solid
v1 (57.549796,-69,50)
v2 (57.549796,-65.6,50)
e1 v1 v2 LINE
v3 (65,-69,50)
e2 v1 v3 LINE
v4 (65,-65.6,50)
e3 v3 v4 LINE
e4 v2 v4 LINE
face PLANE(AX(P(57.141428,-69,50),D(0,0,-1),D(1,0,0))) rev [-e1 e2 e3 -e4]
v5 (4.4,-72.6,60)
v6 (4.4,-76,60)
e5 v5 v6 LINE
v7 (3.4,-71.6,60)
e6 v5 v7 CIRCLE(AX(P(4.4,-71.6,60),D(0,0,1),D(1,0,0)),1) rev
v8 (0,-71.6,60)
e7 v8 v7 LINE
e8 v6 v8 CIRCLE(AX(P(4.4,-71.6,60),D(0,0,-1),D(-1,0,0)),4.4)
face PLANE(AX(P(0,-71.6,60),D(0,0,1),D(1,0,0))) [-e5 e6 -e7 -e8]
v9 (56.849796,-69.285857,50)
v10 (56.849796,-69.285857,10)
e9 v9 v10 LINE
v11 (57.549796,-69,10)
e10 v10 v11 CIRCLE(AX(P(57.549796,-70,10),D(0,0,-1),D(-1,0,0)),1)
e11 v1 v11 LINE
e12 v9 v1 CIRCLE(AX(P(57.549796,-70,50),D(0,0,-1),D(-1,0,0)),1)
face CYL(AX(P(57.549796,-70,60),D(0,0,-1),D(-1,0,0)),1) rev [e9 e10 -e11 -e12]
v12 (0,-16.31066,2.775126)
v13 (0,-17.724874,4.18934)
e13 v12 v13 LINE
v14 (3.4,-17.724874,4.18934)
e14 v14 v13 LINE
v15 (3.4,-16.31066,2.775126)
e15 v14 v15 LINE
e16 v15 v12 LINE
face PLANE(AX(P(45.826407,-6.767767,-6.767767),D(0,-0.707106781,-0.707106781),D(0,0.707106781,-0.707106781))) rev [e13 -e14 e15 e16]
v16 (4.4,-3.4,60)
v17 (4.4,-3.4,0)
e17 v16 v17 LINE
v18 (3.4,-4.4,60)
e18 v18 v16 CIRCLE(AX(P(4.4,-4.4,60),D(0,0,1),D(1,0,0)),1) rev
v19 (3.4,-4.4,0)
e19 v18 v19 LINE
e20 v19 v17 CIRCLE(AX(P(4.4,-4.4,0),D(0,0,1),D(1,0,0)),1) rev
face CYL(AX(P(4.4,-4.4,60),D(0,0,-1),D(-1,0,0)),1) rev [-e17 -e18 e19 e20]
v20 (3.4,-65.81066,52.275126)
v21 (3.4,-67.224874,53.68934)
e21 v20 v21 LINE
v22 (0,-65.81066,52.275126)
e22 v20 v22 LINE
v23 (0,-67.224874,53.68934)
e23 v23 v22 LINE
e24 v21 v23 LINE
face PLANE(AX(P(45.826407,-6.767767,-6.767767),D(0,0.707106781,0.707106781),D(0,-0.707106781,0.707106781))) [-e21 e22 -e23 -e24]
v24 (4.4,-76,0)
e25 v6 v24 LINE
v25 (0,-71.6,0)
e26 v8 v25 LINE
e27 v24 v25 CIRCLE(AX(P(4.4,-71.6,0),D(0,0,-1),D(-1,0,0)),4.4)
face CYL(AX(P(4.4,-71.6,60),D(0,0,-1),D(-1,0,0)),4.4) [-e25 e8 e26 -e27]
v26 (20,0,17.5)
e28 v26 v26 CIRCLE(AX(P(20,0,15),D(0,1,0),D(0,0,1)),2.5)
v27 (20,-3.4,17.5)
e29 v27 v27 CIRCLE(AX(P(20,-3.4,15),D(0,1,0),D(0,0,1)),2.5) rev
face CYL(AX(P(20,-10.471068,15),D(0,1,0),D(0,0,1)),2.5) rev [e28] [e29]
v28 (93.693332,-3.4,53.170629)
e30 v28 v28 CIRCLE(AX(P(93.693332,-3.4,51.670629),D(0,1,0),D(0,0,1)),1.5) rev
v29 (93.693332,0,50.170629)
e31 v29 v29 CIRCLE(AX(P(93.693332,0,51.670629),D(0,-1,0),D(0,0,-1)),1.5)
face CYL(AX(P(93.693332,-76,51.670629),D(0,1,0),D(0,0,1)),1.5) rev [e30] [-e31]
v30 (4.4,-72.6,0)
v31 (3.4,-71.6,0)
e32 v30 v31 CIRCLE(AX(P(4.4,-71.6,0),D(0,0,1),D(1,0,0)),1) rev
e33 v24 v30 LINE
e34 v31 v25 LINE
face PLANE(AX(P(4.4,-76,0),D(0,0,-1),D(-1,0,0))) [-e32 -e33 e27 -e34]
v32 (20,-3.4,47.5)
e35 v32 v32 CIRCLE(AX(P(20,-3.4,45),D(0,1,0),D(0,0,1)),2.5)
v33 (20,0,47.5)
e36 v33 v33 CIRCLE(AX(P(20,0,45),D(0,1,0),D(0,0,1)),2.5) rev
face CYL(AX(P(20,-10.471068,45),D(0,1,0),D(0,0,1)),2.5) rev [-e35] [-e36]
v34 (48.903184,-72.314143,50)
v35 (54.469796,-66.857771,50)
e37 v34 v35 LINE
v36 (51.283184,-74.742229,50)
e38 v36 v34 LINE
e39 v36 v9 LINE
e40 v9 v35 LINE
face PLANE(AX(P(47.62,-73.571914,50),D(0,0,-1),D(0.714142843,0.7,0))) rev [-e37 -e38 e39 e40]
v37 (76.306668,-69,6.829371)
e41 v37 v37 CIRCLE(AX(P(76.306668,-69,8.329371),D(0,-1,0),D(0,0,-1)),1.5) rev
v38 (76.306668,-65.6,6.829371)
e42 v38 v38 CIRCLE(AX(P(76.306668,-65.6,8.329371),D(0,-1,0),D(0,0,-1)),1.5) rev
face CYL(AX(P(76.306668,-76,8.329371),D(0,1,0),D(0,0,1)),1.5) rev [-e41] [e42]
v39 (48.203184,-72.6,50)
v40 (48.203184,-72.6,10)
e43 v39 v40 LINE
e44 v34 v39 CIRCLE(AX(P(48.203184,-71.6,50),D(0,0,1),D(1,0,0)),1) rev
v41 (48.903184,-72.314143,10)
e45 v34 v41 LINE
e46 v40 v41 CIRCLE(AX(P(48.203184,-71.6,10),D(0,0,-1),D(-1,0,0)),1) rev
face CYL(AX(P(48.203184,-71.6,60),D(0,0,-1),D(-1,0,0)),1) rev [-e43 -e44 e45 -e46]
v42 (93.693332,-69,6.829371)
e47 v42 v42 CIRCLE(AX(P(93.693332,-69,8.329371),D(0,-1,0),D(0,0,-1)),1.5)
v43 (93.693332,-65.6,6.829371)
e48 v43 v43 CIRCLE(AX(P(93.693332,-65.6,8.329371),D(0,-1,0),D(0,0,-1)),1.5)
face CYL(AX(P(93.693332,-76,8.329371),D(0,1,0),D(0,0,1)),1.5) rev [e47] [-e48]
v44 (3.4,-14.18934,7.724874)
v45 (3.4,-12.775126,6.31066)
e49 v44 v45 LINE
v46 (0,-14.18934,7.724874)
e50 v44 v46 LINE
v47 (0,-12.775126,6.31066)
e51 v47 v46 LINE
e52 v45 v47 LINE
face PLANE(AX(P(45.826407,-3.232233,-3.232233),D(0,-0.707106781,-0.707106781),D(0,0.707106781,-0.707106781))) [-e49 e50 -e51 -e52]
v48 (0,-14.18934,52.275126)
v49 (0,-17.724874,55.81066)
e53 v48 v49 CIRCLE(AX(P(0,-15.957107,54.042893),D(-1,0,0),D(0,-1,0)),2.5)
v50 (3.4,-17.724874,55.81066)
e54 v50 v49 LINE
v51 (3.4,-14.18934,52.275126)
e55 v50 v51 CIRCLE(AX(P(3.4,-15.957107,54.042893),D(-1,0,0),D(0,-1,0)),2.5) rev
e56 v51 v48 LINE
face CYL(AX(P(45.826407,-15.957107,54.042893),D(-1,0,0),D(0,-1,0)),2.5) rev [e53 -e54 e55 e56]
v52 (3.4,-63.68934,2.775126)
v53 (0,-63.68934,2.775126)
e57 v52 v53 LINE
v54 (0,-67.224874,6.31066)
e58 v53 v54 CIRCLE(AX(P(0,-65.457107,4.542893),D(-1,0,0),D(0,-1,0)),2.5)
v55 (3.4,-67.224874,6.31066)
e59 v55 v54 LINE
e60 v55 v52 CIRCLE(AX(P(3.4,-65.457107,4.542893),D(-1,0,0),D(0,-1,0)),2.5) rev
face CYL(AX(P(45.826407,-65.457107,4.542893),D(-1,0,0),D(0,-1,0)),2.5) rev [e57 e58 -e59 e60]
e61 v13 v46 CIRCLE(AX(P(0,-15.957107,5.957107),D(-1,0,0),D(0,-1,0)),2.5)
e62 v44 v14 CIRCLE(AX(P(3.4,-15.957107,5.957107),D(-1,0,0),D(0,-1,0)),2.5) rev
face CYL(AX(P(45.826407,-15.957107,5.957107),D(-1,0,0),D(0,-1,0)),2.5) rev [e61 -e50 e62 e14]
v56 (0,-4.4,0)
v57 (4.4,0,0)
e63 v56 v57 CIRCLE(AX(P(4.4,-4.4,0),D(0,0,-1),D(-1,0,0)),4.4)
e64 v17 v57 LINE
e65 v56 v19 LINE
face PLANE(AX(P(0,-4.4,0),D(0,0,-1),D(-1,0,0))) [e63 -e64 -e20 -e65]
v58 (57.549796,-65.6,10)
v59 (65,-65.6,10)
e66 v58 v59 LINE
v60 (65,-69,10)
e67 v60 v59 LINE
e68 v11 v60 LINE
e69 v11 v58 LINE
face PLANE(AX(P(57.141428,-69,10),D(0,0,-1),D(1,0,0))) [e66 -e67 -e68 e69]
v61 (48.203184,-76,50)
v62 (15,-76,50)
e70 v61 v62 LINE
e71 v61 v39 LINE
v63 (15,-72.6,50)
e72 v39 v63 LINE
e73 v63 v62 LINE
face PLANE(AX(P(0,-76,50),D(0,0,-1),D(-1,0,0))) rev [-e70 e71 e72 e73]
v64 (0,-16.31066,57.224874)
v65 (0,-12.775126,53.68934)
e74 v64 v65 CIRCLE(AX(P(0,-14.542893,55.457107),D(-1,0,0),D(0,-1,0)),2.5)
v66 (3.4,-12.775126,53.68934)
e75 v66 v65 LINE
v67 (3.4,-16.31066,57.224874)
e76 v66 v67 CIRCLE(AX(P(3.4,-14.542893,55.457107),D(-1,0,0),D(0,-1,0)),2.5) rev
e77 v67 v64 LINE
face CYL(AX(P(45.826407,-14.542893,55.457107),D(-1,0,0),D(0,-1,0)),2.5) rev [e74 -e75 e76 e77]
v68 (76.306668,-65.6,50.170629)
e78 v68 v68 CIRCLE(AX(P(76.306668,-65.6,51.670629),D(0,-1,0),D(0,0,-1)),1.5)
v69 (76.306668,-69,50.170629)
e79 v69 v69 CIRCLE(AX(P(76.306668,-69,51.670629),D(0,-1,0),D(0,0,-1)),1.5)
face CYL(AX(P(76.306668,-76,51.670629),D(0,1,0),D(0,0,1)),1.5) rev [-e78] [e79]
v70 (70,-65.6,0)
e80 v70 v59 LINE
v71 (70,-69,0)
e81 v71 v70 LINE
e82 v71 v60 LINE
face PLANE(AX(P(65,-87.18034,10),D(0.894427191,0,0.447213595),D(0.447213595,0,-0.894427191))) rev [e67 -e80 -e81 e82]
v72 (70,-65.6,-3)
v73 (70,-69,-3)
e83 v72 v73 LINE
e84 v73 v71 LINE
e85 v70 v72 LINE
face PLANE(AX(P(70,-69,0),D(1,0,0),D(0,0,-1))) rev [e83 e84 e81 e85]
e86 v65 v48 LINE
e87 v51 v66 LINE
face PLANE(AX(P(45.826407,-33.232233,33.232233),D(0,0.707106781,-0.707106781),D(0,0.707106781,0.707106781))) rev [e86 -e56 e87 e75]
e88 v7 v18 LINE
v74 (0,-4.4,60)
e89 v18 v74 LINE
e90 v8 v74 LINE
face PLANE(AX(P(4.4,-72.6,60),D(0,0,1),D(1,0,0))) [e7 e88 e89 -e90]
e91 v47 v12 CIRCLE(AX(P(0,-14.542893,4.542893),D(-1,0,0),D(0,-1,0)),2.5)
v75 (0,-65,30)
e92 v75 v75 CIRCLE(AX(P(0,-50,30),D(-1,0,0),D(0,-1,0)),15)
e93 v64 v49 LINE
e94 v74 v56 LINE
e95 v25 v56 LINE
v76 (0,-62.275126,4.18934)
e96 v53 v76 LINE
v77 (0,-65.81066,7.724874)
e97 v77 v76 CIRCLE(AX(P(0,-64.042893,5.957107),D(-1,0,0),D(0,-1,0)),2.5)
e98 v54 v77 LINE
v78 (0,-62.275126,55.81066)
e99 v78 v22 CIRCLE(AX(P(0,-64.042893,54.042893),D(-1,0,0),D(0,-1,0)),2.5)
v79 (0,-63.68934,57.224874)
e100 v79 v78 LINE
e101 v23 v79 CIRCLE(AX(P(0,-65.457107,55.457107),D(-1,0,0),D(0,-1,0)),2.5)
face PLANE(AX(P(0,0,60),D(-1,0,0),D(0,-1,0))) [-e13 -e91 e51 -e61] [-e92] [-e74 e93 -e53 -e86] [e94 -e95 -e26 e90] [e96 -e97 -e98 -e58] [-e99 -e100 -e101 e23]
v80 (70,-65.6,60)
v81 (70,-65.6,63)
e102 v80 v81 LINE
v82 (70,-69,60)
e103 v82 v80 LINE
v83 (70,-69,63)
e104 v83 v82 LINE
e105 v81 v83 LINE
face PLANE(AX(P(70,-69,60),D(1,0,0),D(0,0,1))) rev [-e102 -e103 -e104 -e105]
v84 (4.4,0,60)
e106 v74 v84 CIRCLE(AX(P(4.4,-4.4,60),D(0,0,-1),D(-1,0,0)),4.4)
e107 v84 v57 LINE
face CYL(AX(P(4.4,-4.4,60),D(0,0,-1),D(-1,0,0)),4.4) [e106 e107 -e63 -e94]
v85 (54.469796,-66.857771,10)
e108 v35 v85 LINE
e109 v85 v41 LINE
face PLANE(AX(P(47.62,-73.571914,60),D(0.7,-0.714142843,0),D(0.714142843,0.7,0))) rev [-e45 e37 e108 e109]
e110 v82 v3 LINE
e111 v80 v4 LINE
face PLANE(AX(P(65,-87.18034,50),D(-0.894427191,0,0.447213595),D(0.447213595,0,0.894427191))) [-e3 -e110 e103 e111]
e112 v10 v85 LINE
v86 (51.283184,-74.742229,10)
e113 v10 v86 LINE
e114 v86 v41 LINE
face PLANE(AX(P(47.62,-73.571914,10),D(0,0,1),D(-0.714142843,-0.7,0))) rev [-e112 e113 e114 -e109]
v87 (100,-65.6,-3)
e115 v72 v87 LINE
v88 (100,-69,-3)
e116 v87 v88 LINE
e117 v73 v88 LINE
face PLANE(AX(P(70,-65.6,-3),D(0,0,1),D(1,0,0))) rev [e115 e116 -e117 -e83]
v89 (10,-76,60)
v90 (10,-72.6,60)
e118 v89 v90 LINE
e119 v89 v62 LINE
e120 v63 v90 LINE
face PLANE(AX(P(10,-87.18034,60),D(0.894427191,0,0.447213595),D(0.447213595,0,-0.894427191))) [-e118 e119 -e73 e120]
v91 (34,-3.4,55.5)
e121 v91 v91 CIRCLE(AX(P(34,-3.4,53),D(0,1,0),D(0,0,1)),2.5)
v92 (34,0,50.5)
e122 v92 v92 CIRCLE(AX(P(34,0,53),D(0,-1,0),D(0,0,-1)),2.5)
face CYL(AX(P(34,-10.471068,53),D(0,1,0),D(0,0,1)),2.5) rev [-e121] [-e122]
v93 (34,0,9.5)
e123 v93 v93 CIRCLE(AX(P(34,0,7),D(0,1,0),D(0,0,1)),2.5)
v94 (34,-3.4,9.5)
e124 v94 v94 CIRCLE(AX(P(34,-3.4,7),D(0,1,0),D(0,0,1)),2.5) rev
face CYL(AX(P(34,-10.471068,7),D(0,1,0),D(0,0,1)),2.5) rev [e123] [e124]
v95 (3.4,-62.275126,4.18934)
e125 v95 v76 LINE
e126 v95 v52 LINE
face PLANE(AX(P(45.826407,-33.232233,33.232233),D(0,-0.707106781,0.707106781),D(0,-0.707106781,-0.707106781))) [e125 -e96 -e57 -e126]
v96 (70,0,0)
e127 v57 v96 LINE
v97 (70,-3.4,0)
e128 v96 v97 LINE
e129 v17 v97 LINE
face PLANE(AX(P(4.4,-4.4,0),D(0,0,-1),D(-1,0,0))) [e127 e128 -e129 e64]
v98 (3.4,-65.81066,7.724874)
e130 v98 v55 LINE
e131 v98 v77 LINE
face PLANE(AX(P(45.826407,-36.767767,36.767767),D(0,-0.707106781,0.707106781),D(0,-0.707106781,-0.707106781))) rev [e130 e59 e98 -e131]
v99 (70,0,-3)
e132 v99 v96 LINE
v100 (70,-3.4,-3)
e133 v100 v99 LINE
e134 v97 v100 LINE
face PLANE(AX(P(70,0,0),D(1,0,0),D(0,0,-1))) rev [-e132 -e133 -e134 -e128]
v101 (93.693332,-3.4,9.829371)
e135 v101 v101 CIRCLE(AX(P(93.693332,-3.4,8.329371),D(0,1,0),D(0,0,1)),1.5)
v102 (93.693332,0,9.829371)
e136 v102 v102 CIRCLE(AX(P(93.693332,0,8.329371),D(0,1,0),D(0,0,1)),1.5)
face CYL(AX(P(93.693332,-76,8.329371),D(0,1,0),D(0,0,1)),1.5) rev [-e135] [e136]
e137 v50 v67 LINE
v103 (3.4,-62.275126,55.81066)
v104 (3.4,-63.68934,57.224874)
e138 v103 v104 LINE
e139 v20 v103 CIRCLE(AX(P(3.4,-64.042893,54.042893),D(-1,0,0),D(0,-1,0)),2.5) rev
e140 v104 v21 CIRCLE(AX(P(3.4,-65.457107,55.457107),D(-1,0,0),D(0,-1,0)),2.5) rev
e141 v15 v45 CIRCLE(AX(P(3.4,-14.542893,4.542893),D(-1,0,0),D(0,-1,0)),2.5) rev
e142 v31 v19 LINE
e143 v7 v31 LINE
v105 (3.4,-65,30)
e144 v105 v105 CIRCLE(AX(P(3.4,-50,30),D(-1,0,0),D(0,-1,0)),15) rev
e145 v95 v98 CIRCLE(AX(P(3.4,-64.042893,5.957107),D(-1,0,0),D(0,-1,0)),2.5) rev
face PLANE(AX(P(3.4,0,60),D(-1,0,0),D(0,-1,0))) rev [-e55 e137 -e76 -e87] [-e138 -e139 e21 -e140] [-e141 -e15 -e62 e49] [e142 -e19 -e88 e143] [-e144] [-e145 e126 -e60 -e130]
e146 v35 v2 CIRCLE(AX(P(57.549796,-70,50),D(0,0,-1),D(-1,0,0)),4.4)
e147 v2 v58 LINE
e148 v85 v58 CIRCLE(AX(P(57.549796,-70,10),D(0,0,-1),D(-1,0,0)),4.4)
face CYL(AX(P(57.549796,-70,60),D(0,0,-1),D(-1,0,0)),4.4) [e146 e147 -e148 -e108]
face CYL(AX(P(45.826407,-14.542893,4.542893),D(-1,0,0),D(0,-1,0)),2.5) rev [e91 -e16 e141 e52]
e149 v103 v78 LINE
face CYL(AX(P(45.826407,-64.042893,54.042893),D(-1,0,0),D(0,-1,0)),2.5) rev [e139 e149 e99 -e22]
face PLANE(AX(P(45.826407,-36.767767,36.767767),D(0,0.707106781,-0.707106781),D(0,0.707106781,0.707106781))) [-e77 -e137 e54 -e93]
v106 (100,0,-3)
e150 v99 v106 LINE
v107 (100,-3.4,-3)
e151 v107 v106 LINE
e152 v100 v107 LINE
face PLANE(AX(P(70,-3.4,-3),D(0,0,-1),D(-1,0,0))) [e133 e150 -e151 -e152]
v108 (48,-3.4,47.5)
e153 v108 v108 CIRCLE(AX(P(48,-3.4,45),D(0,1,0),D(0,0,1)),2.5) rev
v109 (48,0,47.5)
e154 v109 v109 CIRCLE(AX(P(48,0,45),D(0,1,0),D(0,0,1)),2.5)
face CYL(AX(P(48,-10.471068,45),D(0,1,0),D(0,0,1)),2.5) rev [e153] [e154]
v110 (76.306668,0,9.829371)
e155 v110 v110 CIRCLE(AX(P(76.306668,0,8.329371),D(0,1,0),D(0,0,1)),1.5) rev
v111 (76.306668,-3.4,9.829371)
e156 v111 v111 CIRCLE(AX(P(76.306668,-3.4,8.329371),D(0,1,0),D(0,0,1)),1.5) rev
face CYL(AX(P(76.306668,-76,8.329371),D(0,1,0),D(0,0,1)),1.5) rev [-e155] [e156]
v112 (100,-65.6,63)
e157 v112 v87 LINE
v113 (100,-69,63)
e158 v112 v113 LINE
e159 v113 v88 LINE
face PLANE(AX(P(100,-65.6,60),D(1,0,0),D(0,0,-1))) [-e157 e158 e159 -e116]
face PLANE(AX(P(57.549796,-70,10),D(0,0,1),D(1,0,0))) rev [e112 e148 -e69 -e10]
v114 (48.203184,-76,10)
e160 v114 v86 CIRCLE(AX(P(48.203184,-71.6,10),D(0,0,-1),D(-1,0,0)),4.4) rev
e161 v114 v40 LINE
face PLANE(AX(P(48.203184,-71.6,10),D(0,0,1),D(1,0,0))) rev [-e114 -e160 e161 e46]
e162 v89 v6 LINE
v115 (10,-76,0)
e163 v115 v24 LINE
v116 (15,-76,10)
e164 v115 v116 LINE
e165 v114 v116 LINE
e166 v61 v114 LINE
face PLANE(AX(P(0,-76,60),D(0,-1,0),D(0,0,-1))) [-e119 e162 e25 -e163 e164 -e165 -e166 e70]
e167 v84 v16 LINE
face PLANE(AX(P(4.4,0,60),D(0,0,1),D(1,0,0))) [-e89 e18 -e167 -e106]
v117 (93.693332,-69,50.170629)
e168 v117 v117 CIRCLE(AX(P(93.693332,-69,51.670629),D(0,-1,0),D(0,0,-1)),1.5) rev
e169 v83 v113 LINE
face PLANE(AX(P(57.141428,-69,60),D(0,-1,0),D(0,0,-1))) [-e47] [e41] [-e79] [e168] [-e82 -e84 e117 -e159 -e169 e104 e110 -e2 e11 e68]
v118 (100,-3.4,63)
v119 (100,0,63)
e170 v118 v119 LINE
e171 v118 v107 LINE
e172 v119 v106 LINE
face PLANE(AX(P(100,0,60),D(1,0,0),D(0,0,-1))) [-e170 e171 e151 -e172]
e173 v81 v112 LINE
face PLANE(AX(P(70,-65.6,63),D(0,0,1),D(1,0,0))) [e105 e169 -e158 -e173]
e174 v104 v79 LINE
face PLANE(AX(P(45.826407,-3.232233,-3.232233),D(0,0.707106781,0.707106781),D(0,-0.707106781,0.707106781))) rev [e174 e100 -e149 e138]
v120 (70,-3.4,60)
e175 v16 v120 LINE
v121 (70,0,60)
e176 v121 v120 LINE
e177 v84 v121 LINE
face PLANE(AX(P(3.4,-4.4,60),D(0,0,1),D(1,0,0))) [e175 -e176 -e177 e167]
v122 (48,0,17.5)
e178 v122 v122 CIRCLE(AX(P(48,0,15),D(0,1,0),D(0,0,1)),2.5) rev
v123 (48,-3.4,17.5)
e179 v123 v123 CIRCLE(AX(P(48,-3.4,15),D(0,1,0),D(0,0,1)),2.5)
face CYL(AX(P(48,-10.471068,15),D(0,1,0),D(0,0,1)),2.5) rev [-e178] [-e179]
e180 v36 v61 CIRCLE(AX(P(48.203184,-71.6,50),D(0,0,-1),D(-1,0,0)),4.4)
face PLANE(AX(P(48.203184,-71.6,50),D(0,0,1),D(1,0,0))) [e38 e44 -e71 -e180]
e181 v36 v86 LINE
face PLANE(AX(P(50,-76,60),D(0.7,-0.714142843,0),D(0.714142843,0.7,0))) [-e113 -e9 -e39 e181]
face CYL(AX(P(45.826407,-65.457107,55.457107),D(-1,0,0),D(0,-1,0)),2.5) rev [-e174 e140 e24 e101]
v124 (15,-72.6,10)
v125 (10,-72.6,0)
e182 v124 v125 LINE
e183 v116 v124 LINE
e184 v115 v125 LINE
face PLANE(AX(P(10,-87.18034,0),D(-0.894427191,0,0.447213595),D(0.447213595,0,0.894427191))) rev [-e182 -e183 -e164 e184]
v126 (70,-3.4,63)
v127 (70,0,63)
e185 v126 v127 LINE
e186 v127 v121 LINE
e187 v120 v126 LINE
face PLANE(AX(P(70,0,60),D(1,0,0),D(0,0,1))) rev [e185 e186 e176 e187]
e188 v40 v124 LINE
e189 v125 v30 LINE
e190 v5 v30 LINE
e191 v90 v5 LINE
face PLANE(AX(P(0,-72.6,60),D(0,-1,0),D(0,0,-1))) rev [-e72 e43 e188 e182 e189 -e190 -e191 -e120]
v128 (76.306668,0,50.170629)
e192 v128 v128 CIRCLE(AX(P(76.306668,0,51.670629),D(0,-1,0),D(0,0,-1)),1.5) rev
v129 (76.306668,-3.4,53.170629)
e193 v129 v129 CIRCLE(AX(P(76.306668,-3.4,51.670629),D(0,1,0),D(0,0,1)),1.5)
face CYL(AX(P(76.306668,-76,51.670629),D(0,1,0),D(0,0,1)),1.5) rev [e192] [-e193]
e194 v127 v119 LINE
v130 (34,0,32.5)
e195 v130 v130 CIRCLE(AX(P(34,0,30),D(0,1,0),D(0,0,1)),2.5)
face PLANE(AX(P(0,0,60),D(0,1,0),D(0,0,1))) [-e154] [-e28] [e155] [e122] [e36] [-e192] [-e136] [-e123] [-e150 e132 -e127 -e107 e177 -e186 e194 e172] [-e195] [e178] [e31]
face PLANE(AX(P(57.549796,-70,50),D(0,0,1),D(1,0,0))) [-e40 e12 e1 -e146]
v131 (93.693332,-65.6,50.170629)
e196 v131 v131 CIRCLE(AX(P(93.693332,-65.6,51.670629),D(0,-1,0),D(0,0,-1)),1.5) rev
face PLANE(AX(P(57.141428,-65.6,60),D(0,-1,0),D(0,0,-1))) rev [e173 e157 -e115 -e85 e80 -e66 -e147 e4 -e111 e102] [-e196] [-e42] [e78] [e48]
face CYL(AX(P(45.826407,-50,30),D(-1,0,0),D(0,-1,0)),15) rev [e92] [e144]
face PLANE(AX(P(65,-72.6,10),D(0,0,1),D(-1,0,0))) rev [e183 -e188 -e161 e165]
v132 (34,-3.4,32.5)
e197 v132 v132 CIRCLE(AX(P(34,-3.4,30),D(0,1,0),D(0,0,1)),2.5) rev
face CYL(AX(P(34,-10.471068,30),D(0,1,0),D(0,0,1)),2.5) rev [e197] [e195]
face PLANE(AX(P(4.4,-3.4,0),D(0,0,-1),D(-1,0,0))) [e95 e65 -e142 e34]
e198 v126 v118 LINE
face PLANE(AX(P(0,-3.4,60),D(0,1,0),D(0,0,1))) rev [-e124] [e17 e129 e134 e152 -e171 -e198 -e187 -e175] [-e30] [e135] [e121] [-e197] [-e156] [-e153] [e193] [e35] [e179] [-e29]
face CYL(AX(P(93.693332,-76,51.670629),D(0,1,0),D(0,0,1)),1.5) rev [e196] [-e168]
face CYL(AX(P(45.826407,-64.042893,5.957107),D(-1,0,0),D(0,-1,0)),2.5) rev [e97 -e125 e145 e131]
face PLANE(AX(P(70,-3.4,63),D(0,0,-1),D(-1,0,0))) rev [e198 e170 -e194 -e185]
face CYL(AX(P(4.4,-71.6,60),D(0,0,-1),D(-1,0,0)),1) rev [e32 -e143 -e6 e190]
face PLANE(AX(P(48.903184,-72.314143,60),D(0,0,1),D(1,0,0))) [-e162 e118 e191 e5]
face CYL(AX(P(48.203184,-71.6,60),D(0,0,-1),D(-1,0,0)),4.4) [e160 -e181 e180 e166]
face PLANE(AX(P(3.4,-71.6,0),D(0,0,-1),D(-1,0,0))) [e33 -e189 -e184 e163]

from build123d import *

# Parameters (mm, degrees)
BASE_FLANGE1_DEPTH             = 60
SKETCH6_R                      = 15
CUT_EXTRUDE1_DEPTH             = 3.4
CUT_EXTRUDE2_START             = -65
CUT_EXTRUDE2_OUTLINE_W         = 10
CUT_EXTRUDE2_OUTLINE_H         = 10.4
CUT_EXTRUDE2_DEPTH             = 50
SKETCH10_W                     = 3
SKETCH10_H                     = 3.4
BOSS_EXTRUDE1_DEPTH            = 30
MIRROR2_COPY_1_SKETCH_W        = 3
MIRROR2_COPY_1_SKETCH_H        = 3.4
MIRROR2_COPY_1_DEPTH           = 30
SKETCH13_R                     = 1.5
CUT_EXTRUDE3_DEPTH             = 141.516902898
CUT_EXTRUDE6_REACH             = 142.517
SKETCH14_R                     = 2.5
CUT_EXTRUDE7_DEPTH             = 5
CUT_EXTRUDE7_DIRECTION_2_REACH = 138.858


# Read off the part's stored shape, not the designer's step: Cut-Extrude2
# Sheet-metal steps are written as plain solids
with BuildPart() as part:
    # Sketch1 → Base-Flange1 (new body)
    with BuildSketch(Plane.XY):
        with BuildLine():
            Line((100, 0), (4.4, 0))
            ThreePointArc((4.4, 0), (1.288730163, -1.288730163), (0, -4.4))
            Line((0, -4.4), (0, -71.6))
            ThreePointArc((0, -71.6), (1.288730163, -74.711269837), (4.4, -76))
            Line((4.4, -76), (48.203183584, -76))
            ThreePointArc((48.203183584, -76), (49.866643015, -75.673438685), (51.283183584, -74.742228509))
            Line((51.283183584, -74.742228509), (56.849795796, -69.285857157))
            ThreePointArc((56.849795796, -69.285857157), (57.171736834, -69.074218481), (57.549795796, -69))
            Line((57.549795796, -69), (100, -69))
            Line((100, -69), (100, -65.6))
            Line((100, -65.6), (57.549795796, -65.6))
            ThreePointArc((57.549795796, -65.6), (55.886336364, -65.926561315), (54.469795796, -66.857771491))
            Line((54.469795796, -66.857771491), (48.903183584, -72.314142843))
            ThreePointArc((48.903183584, -72.314142843), (48.581242545, -72.525781519), (48.203183584, -72.6))
            Line((48.203183584, -72.6), (4.4, -72.6))
            ThreePointArc((4.4, -72.6), (3.692893219, -72.307106781), (3.4, -71.6))
            Line((3.4, -71.6), (3.4, -4.4))
            ThreePointArc((3.4, -4.4), (3.692893219, -3.692893219), (4.4, -3.4))
            Line((4.4, -3.4), (100, -3.4))
            Line((100, -3.4), (100, 0))
        make_face()
    extrude(amount=BASE_FLANGE1_DEPTH)

    # Sketch6 → Cut-Extrude1 (cut)
    with BuildSketch(Plane.ZY):
        with Locations(Location((30, -50, 0), (0, 0, 270))):
            Circle(SKETCH6_R)
        with BuildLine():
            Line((57.224873734, -63.689339828), (55.810660172, -62.275126266))
            ThreePointArc((55.810660172, -62.275126266), (52.275126266, -62.275126266), (52.275126266, -65.810660172))
            Line((52.275126266, -65.810660172), (53.689339828, -67.224873734))
            ThreePointArc((53.689339828, -67.224873734), (57.224873734, -67.224873734), (57.224873734, -63.689339828))
        make_face()
        with BuildLine():
            Line((2.775126266, -16.310660172), (4.189339828, -17.724873734))
            ThreePointArc((4.189339828, -17.724873734), (7.724873734, -17.724873734), (7.724873734, -14.189339828))
            Line((7.724873734, -14.189339828), (6.310660172, -12.775126266))
            ThreePointArc((6.310660172, -12.775126266), (2.775126266, -12.775126266), (2.775126266, -16.310660172))
        make_face()
        with BuildLine():
            Line((53.689339828, -12.775126266), (52.275126266, -14.189339828))
            ThreePointArc((52.275126266, -14.189339828), (52.275126266, -17.724873734), (55.810660172, -17.724873734))
            Line((55.810660172, -17.724873734), (57.224873734, -16.310660172))
            ThreePointArc((57.224873734, -16.310660172), (57.224873734, -12.775126266), (53.689339828, -12.775126266))
        make_face()
        with BuildLine():
            Line((6.310660172, -67.224873734), (7.724873734, -65.810660172))
            ThreePointArc((7.724873734, -65.810660172), (7.724873734, -62.275126266), (4.189339828, -62.275126266))
            Line((4.189339828, -62.275126266), (2.775126266, -63.689339828))
            ThreePointArc((2.775126266, -63.689339828), (2.775126266, -67.224873734), (6.310660172, -67.224873734))
        make_face()
    extrude(amount=-CUT_EXTRUDE1_DEPTH, mode=Mode.SUBTRACT)

    # Cut-Extrude2 outline → Cut-Extrude2 (cut)
    with BuildSketch(Plane.ZY.offset(CUT_EXTRUDE2_START)):
        with Locations((55, -70.8)):
            Rectangle(CUT_EXTRUDE2_OUTLINE_W, CUT_EXTRUDE2_OUTLINE_H)
        with Locations((5, -70.8)):
            Rectangle(CUT_EXTRUDE2_OUTLINE_W, CUT_EXTRUDE2_OUTLINE_H)
    extrude(amount=CUT_EXTRUDE2_DEPTH, mode=Mode.SUBTRACT)

    # Sketch10 → Boss-Extrude1 (add)
    with BuildSketch(Plane(origin=(100, 0, 0), x_dir=(0, 0, -1), z_dir=(1, 0, 0))):
        with Locations((1.5, -1.7)):
            Rectangle(SKETCH10_W, SKETCH10_H)
    boss_extrude1 = extrude(amount=-BOSS_EXTRUDE1_DEPTH)

    # Mirror1: Boss-Extrude1 across plane
    add(boss_extrude1.mirror(Plane(origin=(0, 0, 30), x_dir=(1, 0, 0), z_dir=(0, 0, -1))))

    # Mirror2: Boss-Extrude1 across plane
    add(boss_extrude1.mirror(Plane(origin=(0, -34.5, 0), x_dir=(0, 0, 1), z_dir=(0, -1, 0))))

    # Mirror2 copy 1 sketch → Mirror2 copy 1 (add)
    with BuildSketch(Plane(origin=(100, -69, 60), x_dir=(0, 0, 1), z_dir=(1, 0, 0))):
        with Locations((1.5, -1.7)):
            Rectangle(MIRROR2_COPY_1_SKETCH_W, MIRROR2_COPY_1_SKETCH_H)
    extrude(amount=-MIRROR2_COPY_1_DEPTH)

    # Sketch13 → Cut-Extrude3 (cut, through all)
    with BuildSketch(Plane(origin=(0, 0, 0), x_dir=(1, 0, 0), z_dir=(0, 1, 0))):
        with Locations(Location((76.306667563, -8.329371406, 0), (0, 0, 270))):
            Circle(SKETCH13_R)
        with Locations(Location((93.693332437, -8.329371406, 0), (0, 0, 270))):
            Circle(SKETCH13_R)
    cut_extrude3 = extrude(amount=-CUT_EXTRUDE3_DEPTH, mode=Mode.SUBTRACT)

    # Mirror3: Cut-Extrude3 across plane
    add(cut_extrude3.mirror(Plane(origin=(0, 0, 30), x_dir=(1, 0, 0), z_dir=(0, 0, -1))), mode=Mode.SUBTRACT)

    # Sketch14 → Cut-Extrude6 (cut, up to next)
    with BuildSketch(Plane(origin=(0, 0, 0), x_dir=(1, 0, 0), z_dir=(0, 1, 0)), mode=Mode.PRIVATE) as cut_extrude6_sk1:
        with Locations(Location((20, -15, 0), (0, 0, 270))):
            Circle(SKETCH14_R)
    cut_extrude6_tool1 = extrude(cut_extrude6_sk1.sketch, amount=-CUT_EXTRUDE6_REACH, mode=Mode.PRIVATE) & part.part
    # Sketch14 → Cut-Extrude6 (cut, up to next)
    with BuildSketch(Plane(origin=(0, 0, 0), x_dir=(1, 0, 0), z_dir=(0, 1, 0)), mode=Mode.PRIVATE) as cut_extrude6_sk2:
        with Locations(Location((48, -15, 0), (0, 0, 270))):
            Circle(SKETCH14_R)
    cut_extrude6_tool2 = extrude(cut_extrude6_sk2.sketch, amount=-CUT_EXTRUDE6_REACH, mode=Mode.PRIVATE) & part.part
    # Sketch14 → Cut-Extrude6 (cut, up to next)
    with BuildSketch(Plane(origin=(0, 0, 0), x_dir=(1, 0, 0), z_dir=(0, 1, 0)), mode=Mode.PRIVATE) as cut_extrude6_sk3:
        with Locations(Location((48, -45, 0), (0, 0, 270))):
            Circle(SKETCH14_R)
    cut_extrude6_tool3 = extrude(cut_extrude6_sk3.sketch, amount=-CUT_EXTRUDE6_REACH, mode=Mode.PRIVATE) & part.part
    # Sketch14 → Cut-Extrude6 (cut, up to next)
    with BuildSketch(Plane(origin=(0, 0, 0), x_dir=(1, 0, 0), z_dir=(0, 1, 0)), mode=Mode.PRIVATE) as cut_extrude6_sk4:
        with Locations(Location((20, -45, 0), (0, 0, 270))):
            Circle(SKETCH14_R)
    cut_extrude6_tool4 = extrude(cut_extrude6_sk4.sketch, amount=-CUT_EXTRUDE6_REACH, mode=Mode.PRIVATE) & part.part
    # Sketch14 → Cut-Extrude6 (cut, up to next)
    with BuildSketch(Plane(origin=(0, 0, 0), x_dir=(1, 0, 0), z_dir=(0, 1, 0)), mode=Mode.PRIVATE) as cut_extrude6_sk5:
        with Locations(Location((34, -30, 0), (0, 0, 270))):
            Circle(SKETCH14_R)
    cut_extrude6_tool5 = extrude(cut_extrude6_sk5.sketch, amount=-CUT_EXTRUDE6_REACH, mode=Mode.PRIVATE) & part.part
    # Sketch14 → Cut-Extrude6 (cut, up to next)
    with BuildSketch(Plane(origin=(0, 0, 0), x_dir=(1, 0, 0), z_dir=(0, 1, 0)), mode=Mode.PRIVATE) as cut_extrude6_sk6:
        with Locations(Location((34, -7, 0), (0, 0, 270))):
            Circle(SKETCH14_R)
    cut_extrude6_tool6 = extrude(cut_extrude6_sk6.sketch, amount=-CUT_EXTRUDE6_REACH, mode=Mode.PRIVATE) & part.part
    # Sketch14 → Cut-Extrude6 (cut, up to next)
    with BuildSketch(Plane(origin=(0, 0, 0), x_dir=(1, 0, 0), z_dir=(0, 1, 0)), mode=Mode.PRIVATE) as cut_extrude6_sk7:
        with Locations(Location((34, -53, 0), (0, 0, 270))):
            Circle(SKETCH14_R)
    cut_extrude6_tool7 = extrude(cut_extrude6_sk7.sketch, amount=-CUT_EXTRUDE6_REACH, mode=Mode.PRIVATE) & part.part
    add(cut_extrude6_tool1.solids().sort_by_distance((20, 0, 15))[0], mode=Mode.SUBTRACT)
    add(cut_extrude6_tool2.solids().sort_by_distance((48, 0, 15))[0], mode=Mode.SUBTRACT)
    add(cut_extrude6_tool3.solids().sort_by_distance((48, 0, 45))[0], mode=Mode.SUBTRACT)
    add(cut_extrude6_tool4.solids().sort_by_distance((20, 0, 45))[0], mode=Mode.SUBTRACT)
    add(cut_extrude6_tool5.solids().sort_by_distance((34, 0, 30))[0], mode=Mode.SUBTRACT)
    add(cut_extrude6_tool6.solids().sort_by_distance((34, 0, 7))[0], mode=Mode.SUBTRACT)
    add(cut_extrude6_tool7.solids().sort_by_distance((34, 0, 53))[0], mode=Mode.SUBTRACT)

    # Sketch15 → Cut-Extrude7 (cut)
    with BuildSketch(Plane.XZ.offset(69)):
        Polygon((65, 50), (70, 60), (65, 60), align=None)
        Polygon((15, 50), (15, 60), (10, 60), align=None)
    cut_extrude7 = extrude(amount=-CUT_EXTRUDE7_DEPTH, mode=Mode.SUBTRACT)

    # Cut-Extrude7 direction 2: up to this face of the body (flat: up to its plane)
    cut_extrude7_direction_2_end = Plane(part.part.faces().sort_by_distance((24.509682794, -76, 30))[0])
    # Sketch15 → Cut-Extrude7 direction 2 (cut, up to the picked face)
    with BuildSketch(Plane.XZ.offset(69), mode=Mode.PRIVATE) as cut_extrude7_direction_2_sk1:
        Polygon((65, 50), (70, 60), (65, 60), align=None)
    cut_extrude7_direction_2_tool1 = split(extrude(cut_extrude7_direction_2_sk1.sketch, amount=CUT_EXTRUDE7_DIRECTION_2_REACH, mode=Mode.PRIVATE), bisect_by=cut_extrude7_direction_2_end, keep=Keep.BOTH, mode=Mode.PRIVATE)
    # Sketch15 → Cut-Extrude7 direction 2 (cut, up to the picked face)
    with BuildSketch(Plane.XZ.offset(69), mode=Mode.PRIVATE) as cut_extrude7_direction_2_sk2:
        Polygon((15, 50), (15, 60), (10, 60), align=None)
    cut_extrude7_direction_2_tool2 = split(extrude(cut_extrude7_direction_2_sk2.sketch, amount=CUT_EXTRUDE7_DIRECTION_2_REACH, mode=Mode.PRIVATE), bisect_by=cut_extrude7_direction_2_end, keep=Keep.BOTH, mode=Mode.PRIVATE)
    cut_extrude7_direction_2_1 = cut_extrude7_direction_2_tool1.solids().sort_by(Axis((66.666667, -69, 56.666667), (0, -1, 0)))[0]
    add(cut_extrude7_direction_2_1, mode=Mode.SUBTRACT)
    cut_extrude7_direction_2_2 = cut_extrude7_direction_2_tool2.solids().sort_by(Axis((13.333333, -69, 56.666667), (0, -1, 0)))[0]
    add(cut_extrude7_direction_2_2, mode=Mode.SUBTRACT)
    cut_extrude7_direction_2 = cut_extrude7_direction_2_1 + cut_extrude7_direction_2_2  # Cut-Extrude7 direction 2 as one shape, for the pattern or mirror that repeats it

    # Mirror4: Cut-Extrude7, Cut-Extrude7 direction 2 across plane
    add(cut_extrude7.mirror(Plane(origin=(0, 0, 30), x_dir=(1, 0, 0), z_dir=(0, 0, -1))), mode=Mode.SUBTRACT)
    add(cut_extrude7_direction_2.mirror(Plane(origin=(0, 0, 30), x_dir=(1, 0, 0), z_dir=(0, 0, -1))), mode=Mode.SUBTRACT)


solid = part.part
